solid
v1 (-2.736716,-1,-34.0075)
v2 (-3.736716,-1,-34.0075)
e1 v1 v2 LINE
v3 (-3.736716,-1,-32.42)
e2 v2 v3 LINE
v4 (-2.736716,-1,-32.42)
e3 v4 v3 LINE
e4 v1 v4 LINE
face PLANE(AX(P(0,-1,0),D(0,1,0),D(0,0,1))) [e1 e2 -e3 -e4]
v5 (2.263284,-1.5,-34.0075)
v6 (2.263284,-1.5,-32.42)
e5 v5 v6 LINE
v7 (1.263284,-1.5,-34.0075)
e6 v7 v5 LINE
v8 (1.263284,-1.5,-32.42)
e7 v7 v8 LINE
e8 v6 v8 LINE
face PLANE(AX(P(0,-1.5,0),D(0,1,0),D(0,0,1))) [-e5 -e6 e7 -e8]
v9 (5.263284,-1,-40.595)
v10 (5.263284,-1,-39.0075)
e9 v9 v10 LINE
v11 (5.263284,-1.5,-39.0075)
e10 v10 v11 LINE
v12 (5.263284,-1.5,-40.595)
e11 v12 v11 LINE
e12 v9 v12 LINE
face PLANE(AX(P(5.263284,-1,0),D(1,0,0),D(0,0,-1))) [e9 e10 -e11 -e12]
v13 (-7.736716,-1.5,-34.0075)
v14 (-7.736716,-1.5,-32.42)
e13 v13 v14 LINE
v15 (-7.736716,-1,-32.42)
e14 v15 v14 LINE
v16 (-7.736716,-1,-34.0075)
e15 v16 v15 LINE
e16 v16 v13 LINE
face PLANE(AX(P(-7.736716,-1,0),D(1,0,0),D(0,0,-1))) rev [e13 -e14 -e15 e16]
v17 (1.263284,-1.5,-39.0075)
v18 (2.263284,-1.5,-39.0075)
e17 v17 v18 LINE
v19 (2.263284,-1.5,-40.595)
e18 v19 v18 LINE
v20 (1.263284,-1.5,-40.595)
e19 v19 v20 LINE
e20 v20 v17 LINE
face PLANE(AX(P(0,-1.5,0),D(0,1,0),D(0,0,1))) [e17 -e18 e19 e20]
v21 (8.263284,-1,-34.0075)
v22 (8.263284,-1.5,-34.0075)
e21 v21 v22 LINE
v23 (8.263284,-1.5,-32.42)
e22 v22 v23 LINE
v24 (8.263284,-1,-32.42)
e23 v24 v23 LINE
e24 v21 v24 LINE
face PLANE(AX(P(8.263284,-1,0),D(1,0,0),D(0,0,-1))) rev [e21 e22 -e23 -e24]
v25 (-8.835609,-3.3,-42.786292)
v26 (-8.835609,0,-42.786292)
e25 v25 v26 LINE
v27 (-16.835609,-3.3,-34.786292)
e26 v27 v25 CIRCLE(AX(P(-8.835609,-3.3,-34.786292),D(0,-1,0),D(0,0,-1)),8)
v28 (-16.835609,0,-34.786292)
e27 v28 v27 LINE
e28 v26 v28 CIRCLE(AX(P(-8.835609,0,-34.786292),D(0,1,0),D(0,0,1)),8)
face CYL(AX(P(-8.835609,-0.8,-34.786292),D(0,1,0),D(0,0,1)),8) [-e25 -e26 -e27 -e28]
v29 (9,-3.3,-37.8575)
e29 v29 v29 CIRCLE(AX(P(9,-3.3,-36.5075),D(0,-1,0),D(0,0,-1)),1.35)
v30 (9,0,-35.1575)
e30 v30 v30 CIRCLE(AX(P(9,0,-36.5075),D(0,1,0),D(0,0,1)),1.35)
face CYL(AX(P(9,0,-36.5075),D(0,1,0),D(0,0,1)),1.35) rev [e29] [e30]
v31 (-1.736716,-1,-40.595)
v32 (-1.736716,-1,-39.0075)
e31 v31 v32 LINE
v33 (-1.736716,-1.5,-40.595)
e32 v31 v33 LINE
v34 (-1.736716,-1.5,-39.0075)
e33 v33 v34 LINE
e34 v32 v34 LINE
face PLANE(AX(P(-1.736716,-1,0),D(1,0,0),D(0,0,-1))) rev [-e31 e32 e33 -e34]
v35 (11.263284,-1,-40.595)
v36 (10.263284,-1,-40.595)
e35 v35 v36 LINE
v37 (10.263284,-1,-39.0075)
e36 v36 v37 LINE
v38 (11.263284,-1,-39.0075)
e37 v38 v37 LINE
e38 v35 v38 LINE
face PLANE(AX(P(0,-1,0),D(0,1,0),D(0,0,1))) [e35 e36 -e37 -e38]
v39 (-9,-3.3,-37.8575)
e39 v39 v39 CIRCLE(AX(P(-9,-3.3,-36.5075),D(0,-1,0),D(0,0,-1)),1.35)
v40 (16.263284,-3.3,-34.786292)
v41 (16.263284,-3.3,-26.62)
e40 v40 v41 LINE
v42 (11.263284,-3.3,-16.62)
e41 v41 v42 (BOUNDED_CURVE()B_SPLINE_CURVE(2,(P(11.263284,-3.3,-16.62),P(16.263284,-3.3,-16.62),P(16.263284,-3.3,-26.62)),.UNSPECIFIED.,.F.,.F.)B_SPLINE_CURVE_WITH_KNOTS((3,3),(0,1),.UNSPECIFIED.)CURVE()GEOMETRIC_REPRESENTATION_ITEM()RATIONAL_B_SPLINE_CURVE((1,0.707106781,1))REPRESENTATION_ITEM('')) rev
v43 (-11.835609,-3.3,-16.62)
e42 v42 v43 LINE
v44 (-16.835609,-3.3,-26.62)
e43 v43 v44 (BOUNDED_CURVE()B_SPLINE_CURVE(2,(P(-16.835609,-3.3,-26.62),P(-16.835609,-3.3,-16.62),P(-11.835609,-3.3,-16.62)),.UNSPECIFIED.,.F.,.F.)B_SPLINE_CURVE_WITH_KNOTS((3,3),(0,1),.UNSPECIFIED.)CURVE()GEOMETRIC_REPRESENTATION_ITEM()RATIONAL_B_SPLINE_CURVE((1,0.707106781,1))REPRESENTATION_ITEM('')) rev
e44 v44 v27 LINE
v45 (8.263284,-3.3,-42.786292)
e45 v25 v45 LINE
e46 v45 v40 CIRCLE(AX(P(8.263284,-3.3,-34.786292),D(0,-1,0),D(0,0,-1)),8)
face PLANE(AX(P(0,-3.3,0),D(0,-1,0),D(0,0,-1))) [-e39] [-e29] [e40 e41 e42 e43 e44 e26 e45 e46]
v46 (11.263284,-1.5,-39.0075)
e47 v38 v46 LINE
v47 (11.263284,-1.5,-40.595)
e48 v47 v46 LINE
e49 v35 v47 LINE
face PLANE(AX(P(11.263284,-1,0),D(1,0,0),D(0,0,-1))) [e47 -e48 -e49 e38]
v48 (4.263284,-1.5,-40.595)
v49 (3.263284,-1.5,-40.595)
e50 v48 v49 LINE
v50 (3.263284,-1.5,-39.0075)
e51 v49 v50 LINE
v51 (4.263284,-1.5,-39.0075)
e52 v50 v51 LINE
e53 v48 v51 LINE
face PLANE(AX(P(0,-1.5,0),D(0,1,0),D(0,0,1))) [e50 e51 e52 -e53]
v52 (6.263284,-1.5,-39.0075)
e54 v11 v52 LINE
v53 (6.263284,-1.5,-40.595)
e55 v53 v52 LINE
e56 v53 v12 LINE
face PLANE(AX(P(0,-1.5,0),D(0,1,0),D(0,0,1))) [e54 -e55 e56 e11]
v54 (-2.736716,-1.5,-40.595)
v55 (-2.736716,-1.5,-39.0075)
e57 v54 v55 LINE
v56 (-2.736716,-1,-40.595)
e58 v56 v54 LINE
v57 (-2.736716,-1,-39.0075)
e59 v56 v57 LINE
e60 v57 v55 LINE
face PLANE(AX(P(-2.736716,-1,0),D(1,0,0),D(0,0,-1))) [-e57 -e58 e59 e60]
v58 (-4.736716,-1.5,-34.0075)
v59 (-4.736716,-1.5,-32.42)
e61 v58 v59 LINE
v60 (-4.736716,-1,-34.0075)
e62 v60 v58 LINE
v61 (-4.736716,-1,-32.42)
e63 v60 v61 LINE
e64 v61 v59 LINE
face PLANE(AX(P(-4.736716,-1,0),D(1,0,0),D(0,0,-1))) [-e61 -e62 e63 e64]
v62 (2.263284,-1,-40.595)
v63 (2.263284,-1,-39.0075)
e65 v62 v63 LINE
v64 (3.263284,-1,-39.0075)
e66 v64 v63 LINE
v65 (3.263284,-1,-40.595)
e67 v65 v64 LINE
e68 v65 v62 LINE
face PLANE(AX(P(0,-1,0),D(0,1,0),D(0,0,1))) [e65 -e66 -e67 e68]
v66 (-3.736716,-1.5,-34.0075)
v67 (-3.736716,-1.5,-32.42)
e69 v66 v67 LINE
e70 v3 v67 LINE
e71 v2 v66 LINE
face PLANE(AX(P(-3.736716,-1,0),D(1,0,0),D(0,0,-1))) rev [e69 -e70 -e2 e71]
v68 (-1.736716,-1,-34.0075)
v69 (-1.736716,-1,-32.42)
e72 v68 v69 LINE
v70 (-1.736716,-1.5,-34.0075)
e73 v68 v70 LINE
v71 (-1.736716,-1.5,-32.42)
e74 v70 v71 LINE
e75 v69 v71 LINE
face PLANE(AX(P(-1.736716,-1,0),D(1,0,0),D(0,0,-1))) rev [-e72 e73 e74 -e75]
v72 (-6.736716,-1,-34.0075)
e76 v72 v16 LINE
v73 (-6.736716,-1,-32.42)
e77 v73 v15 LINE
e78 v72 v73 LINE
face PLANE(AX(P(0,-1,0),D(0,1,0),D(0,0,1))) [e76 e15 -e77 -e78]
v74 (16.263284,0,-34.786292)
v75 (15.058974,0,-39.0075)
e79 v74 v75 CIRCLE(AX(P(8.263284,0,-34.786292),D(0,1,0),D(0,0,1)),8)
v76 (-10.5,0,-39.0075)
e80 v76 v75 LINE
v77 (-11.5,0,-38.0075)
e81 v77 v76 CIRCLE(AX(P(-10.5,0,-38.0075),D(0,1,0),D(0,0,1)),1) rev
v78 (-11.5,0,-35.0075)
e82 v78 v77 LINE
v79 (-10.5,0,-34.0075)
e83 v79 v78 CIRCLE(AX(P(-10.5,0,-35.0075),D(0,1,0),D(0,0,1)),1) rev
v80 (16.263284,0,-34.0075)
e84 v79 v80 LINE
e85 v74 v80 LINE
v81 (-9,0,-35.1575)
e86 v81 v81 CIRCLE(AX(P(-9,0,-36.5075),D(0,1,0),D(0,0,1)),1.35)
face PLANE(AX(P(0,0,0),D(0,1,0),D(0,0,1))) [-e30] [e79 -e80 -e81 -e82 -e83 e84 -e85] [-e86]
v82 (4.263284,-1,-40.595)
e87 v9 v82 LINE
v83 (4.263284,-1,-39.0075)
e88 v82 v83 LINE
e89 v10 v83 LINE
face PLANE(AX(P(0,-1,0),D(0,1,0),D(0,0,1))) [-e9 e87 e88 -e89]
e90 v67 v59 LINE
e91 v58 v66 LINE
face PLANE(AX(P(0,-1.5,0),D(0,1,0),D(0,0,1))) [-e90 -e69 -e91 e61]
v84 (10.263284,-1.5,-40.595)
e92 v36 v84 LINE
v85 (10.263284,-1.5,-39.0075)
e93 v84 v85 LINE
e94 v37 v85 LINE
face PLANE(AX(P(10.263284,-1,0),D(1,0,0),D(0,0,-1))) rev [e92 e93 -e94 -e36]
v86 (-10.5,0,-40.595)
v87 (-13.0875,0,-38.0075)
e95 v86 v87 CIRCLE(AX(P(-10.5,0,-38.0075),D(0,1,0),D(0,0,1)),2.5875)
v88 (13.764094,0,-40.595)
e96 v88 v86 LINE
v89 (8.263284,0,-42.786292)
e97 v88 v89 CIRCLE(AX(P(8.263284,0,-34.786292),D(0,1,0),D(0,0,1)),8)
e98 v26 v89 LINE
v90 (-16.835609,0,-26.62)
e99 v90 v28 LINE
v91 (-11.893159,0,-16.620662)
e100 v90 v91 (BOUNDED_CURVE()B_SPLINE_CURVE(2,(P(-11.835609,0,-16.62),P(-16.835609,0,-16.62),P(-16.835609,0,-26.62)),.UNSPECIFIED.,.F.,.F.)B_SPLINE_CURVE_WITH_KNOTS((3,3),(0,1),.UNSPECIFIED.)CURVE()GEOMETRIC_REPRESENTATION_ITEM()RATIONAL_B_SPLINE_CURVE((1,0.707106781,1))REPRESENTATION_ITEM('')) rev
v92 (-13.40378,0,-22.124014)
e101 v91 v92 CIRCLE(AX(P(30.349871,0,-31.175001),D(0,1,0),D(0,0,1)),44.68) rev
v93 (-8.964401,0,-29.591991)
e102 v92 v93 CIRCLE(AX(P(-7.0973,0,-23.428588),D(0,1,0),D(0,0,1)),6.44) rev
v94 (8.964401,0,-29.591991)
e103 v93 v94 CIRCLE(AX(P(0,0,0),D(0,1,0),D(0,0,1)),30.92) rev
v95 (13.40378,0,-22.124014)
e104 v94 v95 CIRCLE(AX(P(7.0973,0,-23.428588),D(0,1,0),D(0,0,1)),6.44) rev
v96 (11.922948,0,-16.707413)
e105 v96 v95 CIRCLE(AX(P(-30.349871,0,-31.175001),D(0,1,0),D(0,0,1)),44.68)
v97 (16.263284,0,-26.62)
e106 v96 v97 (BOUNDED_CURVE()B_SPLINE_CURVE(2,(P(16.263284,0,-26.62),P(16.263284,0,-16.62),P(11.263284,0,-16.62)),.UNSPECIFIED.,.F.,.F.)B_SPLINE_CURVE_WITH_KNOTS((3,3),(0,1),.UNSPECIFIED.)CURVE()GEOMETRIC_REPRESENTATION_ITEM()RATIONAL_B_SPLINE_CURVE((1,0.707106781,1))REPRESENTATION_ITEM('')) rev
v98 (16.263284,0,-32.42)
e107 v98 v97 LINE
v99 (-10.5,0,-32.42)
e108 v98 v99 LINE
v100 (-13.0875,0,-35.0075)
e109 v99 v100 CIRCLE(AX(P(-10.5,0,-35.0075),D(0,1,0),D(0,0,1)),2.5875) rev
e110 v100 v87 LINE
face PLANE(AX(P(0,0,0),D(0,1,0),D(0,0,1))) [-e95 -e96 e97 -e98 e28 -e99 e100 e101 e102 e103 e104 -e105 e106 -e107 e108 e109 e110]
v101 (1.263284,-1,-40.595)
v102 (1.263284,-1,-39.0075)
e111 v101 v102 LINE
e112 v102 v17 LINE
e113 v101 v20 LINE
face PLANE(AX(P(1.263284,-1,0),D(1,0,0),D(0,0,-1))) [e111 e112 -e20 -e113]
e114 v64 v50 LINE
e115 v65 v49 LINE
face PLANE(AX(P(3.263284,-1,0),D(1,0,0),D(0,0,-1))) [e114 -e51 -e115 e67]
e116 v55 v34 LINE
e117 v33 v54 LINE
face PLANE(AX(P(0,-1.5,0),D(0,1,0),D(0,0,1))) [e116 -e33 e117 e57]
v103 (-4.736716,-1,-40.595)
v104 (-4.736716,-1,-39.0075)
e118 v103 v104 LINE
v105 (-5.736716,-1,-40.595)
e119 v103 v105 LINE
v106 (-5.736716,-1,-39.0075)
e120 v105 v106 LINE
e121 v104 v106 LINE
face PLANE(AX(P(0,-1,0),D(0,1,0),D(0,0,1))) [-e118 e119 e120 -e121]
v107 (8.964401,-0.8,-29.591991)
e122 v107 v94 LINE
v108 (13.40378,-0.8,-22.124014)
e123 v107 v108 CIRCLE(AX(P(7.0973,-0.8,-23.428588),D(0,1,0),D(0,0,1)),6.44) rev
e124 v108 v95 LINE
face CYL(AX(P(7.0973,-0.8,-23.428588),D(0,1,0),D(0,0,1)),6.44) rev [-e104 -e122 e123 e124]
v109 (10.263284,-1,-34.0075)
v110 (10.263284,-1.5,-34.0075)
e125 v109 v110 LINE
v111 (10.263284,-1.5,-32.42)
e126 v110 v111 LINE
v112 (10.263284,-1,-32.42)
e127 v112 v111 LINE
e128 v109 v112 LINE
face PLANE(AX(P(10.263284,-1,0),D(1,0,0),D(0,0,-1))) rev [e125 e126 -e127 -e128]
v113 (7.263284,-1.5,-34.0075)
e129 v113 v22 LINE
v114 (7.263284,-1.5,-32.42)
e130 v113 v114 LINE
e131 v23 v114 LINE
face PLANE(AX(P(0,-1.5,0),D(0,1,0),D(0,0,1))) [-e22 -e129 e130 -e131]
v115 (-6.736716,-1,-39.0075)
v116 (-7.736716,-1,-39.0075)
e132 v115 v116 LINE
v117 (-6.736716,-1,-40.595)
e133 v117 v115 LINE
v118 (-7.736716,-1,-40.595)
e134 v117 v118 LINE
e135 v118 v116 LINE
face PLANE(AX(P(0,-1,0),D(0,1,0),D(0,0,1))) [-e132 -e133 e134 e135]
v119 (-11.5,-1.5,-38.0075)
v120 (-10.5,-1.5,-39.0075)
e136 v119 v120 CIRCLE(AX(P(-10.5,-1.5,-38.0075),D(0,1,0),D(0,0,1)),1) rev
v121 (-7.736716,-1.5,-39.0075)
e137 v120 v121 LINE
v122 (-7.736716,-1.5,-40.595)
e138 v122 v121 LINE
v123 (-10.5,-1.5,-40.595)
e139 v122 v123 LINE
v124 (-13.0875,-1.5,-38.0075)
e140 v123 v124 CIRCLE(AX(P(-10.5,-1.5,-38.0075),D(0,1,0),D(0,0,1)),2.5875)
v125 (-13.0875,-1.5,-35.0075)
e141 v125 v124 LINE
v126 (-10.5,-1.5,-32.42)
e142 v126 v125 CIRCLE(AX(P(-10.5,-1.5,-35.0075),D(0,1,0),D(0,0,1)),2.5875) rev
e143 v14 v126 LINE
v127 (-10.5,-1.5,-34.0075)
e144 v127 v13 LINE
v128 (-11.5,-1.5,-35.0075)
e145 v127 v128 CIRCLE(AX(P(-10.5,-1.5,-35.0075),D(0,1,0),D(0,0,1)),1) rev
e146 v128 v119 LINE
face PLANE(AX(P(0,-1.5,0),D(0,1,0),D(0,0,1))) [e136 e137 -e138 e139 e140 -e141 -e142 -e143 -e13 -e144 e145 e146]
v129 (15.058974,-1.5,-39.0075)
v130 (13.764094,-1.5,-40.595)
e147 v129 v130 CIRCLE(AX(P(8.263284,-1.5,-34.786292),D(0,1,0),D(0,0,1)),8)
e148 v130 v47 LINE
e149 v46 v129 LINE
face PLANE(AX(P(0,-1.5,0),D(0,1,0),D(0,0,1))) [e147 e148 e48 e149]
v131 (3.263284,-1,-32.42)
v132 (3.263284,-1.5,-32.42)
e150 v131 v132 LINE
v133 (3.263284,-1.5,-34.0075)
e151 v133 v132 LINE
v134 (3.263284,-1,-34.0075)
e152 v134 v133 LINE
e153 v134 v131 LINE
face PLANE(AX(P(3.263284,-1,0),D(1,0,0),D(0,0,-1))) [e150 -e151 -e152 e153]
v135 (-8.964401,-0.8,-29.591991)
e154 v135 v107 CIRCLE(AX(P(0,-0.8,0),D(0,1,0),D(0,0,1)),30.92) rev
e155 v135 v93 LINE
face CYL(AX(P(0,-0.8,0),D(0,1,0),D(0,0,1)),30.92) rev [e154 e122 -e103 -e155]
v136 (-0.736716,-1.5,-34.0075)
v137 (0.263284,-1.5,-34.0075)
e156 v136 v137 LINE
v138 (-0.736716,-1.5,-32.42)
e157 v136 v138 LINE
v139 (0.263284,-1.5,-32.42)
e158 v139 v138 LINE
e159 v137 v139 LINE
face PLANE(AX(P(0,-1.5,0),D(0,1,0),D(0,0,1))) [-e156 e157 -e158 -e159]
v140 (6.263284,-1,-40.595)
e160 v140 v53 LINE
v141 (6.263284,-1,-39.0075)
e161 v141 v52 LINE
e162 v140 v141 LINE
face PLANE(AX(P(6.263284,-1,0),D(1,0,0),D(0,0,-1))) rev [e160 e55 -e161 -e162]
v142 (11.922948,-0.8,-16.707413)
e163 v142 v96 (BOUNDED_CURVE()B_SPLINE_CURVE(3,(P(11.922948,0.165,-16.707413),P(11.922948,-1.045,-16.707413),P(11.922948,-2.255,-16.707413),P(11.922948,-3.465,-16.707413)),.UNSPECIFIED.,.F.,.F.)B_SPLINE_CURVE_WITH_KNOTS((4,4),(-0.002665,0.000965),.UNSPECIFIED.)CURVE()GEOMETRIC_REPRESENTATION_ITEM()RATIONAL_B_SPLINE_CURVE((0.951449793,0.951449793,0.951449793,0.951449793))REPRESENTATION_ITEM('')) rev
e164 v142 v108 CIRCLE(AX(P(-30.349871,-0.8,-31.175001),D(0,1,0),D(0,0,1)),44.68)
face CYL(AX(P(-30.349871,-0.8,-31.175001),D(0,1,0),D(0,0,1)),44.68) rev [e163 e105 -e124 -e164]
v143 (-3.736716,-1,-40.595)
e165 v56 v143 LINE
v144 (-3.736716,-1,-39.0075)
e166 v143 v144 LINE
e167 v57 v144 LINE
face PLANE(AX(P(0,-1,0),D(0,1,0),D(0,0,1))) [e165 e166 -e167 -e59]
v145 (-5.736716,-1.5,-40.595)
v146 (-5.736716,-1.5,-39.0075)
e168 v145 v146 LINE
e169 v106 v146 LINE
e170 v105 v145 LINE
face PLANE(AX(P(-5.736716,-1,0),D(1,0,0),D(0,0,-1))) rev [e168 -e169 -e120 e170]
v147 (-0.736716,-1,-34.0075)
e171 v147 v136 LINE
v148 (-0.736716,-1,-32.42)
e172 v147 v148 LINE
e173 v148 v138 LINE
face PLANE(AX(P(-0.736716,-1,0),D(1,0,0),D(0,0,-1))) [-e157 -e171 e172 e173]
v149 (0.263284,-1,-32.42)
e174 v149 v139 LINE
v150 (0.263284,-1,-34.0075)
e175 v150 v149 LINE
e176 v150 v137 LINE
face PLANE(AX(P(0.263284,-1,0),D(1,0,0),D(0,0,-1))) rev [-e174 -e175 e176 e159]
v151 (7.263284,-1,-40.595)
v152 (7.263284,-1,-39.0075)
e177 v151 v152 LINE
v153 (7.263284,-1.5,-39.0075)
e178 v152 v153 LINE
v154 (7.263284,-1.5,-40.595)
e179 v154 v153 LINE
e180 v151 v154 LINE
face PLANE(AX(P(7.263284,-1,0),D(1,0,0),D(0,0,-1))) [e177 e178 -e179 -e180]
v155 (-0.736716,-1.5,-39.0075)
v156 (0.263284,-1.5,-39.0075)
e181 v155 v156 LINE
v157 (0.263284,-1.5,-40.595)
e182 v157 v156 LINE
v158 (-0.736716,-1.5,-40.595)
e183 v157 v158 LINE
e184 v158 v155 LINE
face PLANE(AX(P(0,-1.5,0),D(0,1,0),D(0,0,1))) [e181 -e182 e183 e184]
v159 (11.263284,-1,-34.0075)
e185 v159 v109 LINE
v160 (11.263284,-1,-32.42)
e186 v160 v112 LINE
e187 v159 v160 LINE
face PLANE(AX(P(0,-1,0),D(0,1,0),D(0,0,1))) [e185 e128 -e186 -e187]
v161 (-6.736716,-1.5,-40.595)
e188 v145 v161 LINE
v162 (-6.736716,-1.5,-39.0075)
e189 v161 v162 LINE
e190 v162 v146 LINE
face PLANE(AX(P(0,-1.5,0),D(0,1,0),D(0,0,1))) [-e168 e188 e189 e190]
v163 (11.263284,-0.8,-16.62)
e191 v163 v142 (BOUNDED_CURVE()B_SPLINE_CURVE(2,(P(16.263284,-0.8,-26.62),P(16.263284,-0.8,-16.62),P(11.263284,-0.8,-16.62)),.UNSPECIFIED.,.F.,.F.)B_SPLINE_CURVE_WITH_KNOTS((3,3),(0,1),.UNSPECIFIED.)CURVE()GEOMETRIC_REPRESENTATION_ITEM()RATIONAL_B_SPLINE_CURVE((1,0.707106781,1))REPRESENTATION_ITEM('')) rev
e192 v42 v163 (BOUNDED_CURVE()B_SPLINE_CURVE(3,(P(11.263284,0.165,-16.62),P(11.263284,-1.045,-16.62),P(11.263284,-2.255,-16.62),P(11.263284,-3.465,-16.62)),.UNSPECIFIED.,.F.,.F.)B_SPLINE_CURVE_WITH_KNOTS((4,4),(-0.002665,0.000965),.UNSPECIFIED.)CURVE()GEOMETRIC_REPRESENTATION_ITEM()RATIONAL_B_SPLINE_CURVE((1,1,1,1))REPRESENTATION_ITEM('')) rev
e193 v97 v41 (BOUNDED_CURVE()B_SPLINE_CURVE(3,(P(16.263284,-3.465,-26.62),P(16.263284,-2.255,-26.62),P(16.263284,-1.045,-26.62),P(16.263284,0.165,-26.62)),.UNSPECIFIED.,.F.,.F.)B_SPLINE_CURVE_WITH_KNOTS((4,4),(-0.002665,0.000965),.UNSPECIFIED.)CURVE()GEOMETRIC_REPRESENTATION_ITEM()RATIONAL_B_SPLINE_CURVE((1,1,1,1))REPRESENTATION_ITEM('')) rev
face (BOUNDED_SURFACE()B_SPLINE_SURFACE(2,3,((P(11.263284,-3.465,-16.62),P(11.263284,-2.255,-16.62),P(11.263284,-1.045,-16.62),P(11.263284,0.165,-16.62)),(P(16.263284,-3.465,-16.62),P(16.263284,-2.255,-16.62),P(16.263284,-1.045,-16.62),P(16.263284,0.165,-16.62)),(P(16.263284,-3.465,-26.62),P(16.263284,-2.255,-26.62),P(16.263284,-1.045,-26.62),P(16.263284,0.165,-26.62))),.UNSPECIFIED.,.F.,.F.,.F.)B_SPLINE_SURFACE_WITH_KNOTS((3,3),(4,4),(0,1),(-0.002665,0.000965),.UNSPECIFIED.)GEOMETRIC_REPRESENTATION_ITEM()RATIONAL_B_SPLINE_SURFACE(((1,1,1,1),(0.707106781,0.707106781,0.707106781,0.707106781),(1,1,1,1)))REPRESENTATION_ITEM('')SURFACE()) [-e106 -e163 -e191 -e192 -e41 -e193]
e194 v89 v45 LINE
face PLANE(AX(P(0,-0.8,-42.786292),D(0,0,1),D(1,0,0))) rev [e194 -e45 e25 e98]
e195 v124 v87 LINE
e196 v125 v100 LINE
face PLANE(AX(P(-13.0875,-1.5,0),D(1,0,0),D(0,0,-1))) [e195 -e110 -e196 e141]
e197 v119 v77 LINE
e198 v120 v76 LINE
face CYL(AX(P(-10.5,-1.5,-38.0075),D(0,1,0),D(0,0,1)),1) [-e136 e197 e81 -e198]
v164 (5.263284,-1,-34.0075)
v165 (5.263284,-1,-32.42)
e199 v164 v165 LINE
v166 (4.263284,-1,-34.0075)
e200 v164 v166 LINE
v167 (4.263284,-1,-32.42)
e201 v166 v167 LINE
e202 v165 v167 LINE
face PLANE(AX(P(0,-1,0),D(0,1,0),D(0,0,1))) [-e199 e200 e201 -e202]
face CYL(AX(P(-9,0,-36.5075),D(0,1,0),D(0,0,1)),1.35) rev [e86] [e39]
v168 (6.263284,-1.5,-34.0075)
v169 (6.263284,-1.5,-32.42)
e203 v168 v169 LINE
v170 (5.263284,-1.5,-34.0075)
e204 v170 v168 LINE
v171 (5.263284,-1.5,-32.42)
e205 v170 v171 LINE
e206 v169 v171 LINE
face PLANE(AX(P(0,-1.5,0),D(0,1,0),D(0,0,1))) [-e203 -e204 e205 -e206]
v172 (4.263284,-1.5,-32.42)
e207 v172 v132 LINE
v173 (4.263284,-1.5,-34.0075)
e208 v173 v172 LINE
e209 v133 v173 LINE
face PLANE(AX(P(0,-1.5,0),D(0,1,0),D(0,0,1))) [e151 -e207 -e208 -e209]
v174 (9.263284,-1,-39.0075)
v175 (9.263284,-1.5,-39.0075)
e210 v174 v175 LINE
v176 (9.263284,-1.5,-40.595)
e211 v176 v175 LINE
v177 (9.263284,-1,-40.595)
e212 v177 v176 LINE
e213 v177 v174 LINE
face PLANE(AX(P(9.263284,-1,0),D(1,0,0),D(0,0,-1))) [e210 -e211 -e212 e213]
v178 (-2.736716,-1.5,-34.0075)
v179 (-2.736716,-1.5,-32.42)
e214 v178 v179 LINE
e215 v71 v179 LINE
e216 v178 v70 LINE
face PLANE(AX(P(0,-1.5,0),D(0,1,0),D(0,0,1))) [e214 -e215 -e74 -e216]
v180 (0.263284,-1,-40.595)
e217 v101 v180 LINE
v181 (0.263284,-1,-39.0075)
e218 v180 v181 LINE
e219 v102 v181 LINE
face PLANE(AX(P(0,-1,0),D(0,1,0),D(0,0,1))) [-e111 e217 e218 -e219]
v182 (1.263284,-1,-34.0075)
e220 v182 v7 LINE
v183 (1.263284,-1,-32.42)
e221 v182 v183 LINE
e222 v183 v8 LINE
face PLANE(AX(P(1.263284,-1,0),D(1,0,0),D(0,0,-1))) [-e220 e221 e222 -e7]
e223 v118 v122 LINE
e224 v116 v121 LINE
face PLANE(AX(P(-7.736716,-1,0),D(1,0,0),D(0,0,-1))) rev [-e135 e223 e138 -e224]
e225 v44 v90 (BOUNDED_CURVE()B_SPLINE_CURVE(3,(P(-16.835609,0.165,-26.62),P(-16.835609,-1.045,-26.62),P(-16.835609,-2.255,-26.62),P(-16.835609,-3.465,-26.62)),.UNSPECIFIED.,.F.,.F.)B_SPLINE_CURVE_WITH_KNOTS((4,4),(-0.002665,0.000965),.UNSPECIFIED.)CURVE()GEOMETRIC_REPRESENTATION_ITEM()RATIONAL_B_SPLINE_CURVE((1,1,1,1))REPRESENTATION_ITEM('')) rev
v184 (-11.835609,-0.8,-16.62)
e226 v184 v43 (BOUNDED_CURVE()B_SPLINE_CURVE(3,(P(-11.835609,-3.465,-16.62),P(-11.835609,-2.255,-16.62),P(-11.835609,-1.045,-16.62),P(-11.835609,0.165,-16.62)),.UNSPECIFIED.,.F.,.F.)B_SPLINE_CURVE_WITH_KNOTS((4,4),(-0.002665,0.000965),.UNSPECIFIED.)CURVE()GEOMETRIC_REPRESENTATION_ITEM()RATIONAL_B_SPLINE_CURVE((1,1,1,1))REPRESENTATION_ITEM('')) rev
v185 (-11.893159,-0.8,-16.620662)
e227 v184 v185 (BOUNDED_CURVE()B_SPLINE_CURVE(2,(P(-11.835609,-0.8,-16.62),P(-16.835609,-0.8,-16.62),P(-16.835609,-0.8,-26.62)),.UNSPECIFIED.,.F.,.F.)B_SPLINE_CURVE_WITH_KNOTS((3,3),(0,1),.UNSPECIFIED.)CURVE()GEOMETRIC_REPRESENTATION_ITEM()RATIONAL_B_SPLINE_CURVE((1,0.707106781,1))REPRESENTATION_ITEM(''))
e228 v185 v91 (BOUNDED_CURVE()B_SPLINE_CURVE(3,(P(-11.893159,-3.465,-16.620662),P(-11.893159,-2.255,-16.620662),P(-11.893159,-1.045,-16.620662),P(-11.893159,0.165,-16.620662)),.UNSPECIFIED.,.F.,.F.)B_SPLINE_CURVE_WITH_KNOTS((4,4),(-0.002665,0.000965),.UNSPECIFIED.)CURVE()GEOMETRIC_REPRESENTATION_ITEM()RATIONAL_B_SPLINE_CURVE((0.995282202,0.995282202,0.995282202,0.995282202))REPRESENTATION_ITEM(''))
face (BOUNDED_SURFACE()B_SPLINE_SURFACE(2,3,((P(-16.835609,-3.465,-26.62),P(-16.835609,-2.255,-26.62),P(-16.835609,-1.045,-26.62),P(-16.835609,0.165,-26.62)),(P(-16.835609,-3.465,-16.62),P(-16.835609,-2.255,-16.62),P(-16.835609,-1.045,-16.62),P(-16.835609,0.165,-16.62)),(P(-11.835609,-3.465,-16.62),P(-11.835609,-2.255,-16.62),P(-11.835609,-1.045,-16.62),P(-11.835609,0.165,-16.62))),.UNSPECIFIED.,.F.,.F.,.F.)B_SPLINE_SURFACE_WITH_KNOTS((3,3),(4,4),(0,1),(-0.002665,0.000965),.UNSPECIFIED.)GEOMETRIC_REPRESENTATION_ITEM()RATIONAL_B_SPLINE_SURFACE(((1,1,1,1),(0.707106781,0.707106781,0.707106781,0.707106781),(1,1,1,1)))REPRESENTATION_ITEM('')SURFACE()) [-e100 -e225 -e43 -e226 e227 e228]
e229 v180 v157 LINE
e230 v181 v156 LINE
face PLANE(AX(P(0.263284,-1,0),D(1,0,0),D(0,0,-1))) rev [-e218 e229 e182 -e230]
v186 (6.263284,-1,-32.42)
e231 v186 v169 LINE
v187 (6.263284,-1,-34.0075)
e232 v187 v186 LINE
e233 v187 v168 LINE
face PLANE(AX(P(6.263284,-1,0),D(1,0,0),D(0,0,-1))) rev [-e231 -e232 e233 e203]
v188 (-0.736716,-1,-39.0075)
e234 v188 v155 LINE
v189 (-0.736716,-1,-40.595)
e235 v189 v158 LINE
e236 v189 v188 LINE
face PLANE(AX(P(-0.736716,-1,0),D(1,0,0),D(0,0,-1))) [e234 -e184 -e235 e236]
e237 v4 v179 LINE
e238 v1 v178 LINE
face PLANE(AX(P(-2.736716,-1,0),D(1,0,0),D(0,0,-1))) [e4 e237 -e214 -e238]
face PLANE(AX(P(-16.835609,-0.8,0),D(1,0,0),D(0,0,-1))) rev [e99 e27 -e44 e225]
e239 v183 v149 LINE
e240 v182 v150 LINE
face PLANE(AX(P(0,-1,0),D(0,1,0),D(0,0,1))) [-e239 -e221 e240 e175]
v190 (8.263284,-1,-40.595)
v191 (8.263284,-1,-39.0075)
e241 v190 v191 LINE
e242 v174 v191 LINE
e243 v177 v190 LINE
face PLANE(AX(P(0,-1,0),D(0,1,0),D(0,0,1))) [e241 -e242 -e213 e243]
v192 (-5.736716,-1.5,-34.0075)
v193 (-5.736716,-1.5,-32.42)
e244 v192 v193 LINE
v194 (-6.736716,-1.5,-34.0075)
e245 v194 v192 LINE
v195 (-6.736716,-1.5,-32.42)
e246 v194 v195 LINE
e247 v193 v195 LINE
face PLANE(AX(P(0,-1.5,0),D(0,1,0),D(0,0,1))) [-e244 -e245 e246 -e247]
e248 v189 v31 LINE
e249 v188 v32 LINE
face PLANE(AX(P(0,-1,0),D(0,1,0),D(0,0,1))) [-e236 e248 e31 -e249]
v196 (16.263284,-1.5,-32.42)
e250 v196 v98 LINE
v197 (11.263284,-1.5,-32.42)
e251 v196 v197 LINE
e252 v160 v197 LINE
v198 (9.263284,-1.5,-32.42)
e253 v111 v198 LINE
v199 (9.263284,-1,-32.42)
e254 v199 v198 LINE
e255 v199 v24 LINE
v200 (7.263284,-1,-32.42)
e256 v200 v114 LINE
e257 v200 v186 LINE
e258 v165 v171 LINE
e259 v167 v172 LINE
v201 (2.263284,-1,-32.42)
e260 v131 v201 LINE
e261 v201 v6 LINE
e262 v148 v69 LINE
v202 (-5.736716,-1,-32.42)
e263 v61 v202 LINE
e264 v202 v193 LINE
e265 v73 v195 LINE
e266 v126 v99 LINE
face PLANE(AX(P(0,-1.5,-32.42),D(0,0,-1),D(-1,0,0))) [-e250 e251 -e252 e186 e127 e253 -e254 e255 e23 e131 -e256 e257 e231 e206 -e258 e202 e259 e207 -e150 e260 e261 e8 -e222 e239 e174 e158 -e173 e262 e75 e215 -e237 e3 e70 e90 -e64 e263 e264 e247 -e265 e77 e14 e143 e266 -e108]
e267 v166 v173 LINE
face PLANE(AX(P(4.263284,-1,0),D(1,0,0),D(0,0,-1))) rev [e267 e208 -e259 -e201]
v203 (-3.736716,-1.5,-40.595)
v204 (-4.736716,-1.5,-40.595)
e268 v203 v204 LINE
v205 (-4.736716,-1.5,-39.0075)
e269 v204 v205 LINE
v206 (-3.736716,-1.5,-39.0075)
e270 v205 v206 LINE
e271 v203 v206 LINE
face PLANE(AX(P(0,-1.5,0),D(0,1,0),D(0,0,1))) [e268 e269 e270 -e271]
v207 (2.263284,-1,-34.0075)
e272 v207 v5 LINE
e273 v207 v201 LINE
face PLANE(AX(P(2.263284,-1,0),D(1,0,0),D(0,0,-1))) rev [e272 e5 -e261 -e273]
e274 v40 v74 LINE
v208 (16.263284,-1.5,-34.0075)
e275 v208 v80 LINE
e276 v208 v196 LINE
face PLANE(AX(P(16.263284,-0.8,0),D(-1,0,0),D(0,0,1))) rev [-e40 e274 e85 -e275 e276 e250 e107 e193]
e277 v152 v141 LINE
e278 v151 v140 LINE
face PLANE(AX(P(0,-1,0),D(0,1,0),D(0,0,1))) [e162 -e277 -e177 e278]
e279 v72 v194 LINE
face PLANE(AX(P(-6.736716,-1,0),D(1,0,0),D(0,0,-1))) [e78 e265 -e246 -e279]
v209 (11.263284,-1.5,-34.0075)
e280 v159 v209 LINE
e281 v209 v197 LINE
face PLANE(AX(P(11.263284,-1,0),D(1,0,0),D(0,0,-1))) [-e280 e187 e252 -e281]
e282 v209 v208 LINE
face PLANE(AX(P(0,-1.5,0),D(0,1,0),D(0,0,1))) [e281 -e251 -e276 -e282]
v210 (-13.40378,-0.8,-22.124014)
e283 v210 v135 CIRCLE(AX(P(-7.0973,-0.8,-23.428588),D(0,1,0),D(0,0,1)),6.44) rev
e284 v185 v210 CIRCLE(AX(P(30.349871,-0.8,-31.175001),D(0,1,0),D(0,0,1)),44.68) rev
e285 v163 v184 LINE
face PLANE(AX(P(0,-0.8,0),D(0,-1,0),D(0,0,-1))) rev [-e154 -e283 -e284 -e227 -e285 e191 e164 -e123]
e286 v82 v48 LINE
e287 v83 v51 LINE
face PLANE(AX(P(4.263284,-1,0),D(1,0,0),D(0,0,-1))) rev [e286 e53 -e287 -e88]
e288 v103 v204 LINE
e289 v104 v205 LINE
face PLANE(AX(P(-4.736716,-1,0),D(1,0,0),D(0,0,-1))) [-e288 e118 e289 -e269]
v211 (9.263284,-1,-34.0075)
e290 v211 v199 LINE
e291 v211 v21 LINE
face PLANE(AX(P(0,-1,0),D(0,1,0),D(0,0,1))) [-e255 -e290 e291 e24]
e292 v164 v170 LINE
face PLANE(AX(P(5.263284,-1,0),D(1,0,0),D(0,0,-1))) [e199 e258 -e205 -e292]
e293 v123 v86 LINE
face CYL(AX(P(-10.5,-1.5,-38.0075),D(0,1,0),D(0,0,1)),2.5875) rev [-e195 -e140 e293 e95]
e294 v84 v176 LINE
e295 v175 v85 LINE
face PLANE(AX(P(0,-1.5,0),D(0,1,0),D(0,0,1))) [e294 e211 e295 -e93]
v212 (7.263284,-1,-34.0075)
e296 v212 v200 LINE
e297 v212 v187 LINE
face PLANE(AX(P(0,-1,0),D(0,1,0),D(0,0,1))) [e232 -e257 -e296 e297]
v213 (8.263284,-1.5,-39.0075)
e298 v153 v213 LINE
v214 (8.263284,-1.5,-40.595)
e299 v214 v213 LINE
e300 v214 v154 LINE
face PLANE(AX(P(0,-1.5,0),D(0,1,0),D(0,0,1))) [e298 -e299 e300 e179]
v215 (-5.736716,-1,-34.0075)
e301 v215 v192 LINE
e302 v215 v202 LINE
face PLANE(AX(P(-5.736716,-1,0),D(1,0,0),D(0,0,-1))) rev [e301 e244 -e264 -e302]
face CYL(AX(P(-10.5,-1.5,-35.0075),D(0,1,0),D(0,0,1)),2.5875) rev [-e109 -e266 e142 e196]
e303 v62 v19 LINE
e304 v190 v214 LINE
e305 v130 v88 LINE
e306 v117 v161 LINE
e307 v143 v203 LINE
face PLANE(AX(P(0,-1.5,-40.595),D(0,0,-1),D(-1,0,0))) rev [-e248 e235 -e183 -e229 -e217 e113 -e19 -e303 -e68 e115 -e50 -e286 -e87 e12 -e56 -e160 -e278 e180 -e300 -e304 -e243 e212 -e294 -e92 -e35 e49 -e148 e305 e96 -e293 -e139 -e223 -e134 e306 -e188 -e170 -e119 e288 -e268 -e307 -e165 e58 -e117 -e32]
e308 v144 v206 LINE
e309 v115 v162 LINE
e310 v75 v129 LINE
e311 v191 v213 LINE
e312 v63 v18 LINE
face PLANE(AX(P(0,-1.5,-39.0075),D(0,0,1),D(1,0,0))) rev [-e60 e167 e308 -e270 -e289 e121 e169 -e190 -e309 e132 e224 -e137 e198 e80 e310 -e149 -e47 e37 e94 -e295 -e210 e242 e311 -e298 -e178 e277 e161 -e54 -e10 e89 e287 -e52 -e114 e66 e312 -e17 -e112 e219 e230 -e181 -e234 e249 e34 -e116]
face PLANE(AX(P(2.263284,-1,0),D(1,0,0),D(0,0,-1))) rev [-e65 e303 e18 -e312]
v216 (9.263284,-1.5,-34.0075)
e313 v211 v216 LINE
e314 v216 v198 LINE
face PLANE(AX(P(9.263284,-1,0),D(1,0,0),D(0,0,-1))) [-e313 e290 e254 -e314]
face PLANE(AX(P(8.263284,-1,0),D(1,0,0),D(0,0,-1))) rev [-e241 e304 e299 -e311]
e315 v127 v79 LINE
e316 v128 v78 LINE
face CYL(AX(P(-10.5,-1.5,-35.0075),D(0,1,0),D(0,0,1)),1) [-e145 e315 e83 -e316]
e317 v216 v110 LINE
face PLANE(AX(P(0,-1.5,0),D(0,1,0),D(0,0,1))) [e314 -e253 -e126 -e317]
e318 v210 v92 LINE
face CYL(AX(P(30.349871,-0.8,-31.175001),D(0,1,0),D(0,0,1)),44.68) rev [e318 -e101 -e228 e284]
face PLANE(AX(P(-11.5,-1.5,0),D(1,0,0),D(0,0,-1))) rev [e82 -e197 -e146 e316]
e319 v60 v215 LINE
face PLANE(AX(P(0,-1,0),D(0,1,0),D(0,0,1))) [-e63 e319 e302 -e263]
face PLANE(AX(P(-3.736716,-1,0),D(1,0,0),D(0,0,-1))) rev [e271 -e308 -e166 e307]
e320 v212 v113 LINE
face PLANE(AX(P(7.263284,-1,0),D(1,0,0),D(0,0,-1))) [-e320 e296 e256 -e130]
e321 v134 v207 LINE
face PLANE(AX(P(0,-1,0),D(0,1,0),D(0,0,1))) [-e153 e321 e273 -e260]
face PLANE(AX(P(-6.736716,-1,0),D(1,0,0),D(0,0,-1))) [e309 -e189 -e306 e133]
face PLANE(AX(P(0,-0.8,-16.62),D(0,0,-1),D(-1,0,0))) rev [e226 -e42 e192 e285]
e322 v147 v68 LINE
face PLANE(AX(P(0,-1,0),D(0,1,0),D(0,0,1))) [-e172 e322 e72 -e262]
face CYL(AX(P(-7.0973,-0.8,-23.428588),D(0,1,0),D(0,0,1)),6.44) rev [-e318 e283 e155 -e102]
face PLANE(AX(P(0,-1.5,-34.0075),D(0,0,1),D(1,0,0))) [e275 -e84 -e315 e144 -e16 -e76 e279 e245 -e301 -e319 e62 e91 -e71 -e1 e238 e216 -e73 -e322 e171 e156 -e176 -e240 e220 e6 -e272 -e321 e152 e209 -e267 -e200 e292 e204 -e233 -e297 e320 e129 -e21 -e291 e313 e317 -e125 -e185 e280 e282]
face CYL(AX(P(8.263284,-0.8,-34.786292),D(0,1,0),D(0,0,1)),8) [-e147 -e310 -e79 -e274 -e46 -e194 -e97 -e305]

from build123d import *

# Parameters (mm, degrees)
BOSS_EXTRUDE1_DEPTH        = 0.8
BOSS_EXTRUDE4_START        = -0.8
BOSS_EXTRUDE4_DEPTH        = 2.5
CUT_EXTRUDE2_DEPTH         = 1.5
M2_5_CLEARANCE_HOLE1_D     = 2.7
M2_5_CLEARANCE_HOLE1_DEPTH = 11.188838164
M2_5_CLEARANCE_HOLE1_TIP   = 0.811161836
BOSS_EXTRUDE7_START        = -1.5
SKETCH11_W                 = 1
SKETCH11_H                 = 1.5875
BOSS_EXTRUDE7_DEPTH        = 0.5
LPATTERN2_COUNT            = 10
LPATTERN2_PITCH            = 2
FILLET4_R                  = 8
FILLET6_SIZE               = 5
FILLET6_SIZE_2             = 10
FILLET7_SIZE               = 5
FILLET7_SIZE_2             = 10


with BuildPart() as part:
    # Sketch3 → Boss-Extrude1 (new body)
    with BuildSketch(Plane(origin=(0, 0, 0), x_dir=(1, 0, 0), z_dir=(0, 1, 0))):
        with BuildLine():
            ThreePointArc((-8.964400592, 29.591990842), (0, 30.92), (8.964400592, 29.591990842))
            ThreePointArc((8.964400592, 29.591990842), (12.633049801, 26.719344266), (13.403780114, 22.124014011))
            ThreePointArc((13.403780114, 22.124014011), (12.736333478, 19.347857063), (11.892930693, 16.62))
            Line((11.892930693, 16.62), (16.263283948, 16.62))
            Line((16.263283948, 16.62), (16.263283948, 42.786292272))
            Line((16.263283948, 42.786292272), (-16.835608917, 42.786292272))
            Line((-16.835608917, 42.786292272), (-16.835608917, 16.62))
            Line((-16.835608917, 16.62), (-11.892930693, 16.62))
            ThreePointArc((-11.892930693, 16.62), (-12.736333478, 19.347857063), (-13.403780114, 22.124014011))
            ThreePointArc((-13.403780114, 22.124014011), (-12.633049801, 26.719344266), (-8.964400592, 29.591990842))
        make_face()
        with BuildLine():
            Line((-10.5, 32.42), (16.263283948, 32.42))
            Line((16.263283948, 32.42), (16.263283948, 34.0075))
            Line((16.263283948, 34.0075), (-10.5, 34.0075))
            ThreePointArc((-10.5, 34.0075), (-11.207106781, 34.300393219), (-11.5, 35.0075))
            Line((-11.5, 35.0075), (-11.5, 38.0075))
            ThreePointArc((-11.5, 38.0075), (-11.207106781, 38.714606781), (-10.5, 39.0075))
            Line((-10.5, 39.0075), (16.263283948, 39.0075))
            Line((16.263283948, 39.0075), (16.263283948, 40.595))
            Line((16.263283948, 40.595), (-10.5, 40.595))
            ThreePointArc((-10.5, 40.595), (-12.329638796, 39.837138796), (-13.0875, 38.0075))
            Line((-13.0875, 38.0075), (-13.0875, 35.0075))
            ThreePointArc((-13.0875, 35.0075), (-12.329638796, 33.177861204), (-10.5, 32.42))
        make_face()
        with BuildLine():
            Line((-10.5, 34.0075), (16.263283948, 34.0075))
            Line((16.263283948, 34.0075), (16.263283948, 39.0075))
            Line((16.263283948, 39.0075), (-10.5, 39.0075))
            ThreePointArc((-10.5, 39.0075), (-11.207106781, 38.714606781), (-11.5, 38.0075))
            Line((-11.5, 38.0075), (-11.5, 35.0075))
            ThreePointArc((-11.5, 35.0075), (-11.207106781, 34.300393219), (-10.5, 34.0075))
        make_face()
    extrude(amount=-BOSS_EXTRUDE1_DEPTH)

    # Sketch3<5> → Boss-Extrude4 (add)
    with BuildSketch(Plane(origin=(0, 0, 0), x_dir=(1, 0, 0), z_dir=(0, 1, 0)).offset(BOSS_EXTRUDE4_START)):
        with BuildLine():
            ThreePointArc((-8.964400592, 29.591990842), (0, 30.92), (8.964400592, 29.591990842))
            ThreePointArc((8.964400592, 29.591990842), (12.633049801, 26.719344266), (13.403780114, 22.124014011))
            ThreePointArc((13.403780114, 22.124014011), (12.736333478, 19.347857063), (11.892930693, 16.62))
            Line((11.892930693, 16.62), (16.263283948, 16.62))
            Line((16.263283948, 16.62), (16.263283948, 42.786292272))
            Line((16.263283948, 42.786292272), (-16.835608917, 42.786292272))
            Line((-16.835608917, 42.786292272), (-16.835608917, 16.62))
            Line((-16.835608917, 16.62), (-11.892930693, 16.62))
            ThreePointArc((-11.892930693, 16.62), (-12.736333478, 19.347857063), (-13.403780114, 22.124014011))
            ThreePointArc((-13.403780114, 22.124014011), (-12.633049801, 26.719344266), (-8.964400592, 29.591990842))
        make_face()
        with BuildLine():
            ThreePointArc((8.964400592, 29.591990842), (12.633049801, 26.719344266), (13.403780114, 22.124014011))
            ThreePointArc((13.403780114, 22.124014011), (12.736333478, 19.347857063), (11.892930693, 16.62))
            Line((11.892930693, 16.62), (-11.892930693, 16.62))
            ThreePointArc((-11.892930693, 16.62), (-12.736333478, 19.347857063), (-13.403780114, 22.124014011))
            ThreePointArc((-13.403780114, 22.124014011), (-12.633049801, 26.719344266), (-8.964400592, 29.591990842))
            ThreePointArc((-8.964400592, 29.591990842), (0, 30.92), (8.964400592, 29.591990842))
        make_face()
        with BuildLine():
            Line((-10.5, 32.42), (16.263283948, 32.42))
            Line((16.263283948, 32.42), (16.263283948, 34.0075))
            Line((16.263283948, 34.0075), (-10.5, 34.0075))
            ThreePointArc((-10.5, 34.0075), (-11.207106781, 34.300393219), (-11.5, 35.0075))
            Line((-11.5, 35.0075), (-11.5, 38.0075))
            ThreePointArc((-11.5, 38.0075), (-11.207106781, 38.714606781), (-10.5, 39.0075))
            Line((-10.5, 39.0075), (16.263283948, 39.0075))
            Line((16.263283948, 39.0075), (16.263283948, 40.595))
            Line((16.263283948, 40.595), (-10.5, 40.595))
            ThreePointArc((-10.5, 40.595), (-12.329638796, 39.837138796), (-13.0875, 38.0075))
            Line((-13.0875, 38.0075), (-13.0875, 35.0075))
            ThreePointArc((-13.0875, 35.0075), (-12.329638796, 33.177861204), (-10.5, 32.42))
        make_face()
        with BuildLine():
            Line((-10.5, 34.0075), (16.263283948, 34.0075))
            Line((16.263283948, 34.0075), (16.263283948, 39.0075))
            Line((16.263283948, 39.0075), (-10.5, 39.0075))
            ThreePointArc((-10.5, 39.0075), (-11.207106781, 38.714606781), (-11.5, 38.0075))
            Line((-11.5, 38.0075), (-11.5, 35.0075))
            ThreePointArc((-11.5, 35.0075), (-11.207106781, 34.300393219), (-10.5, 34.0075))
        make_face()
    extrude(amount=-BOSS_EXTRUDE4_DEPTH)

    # Sketch3<7> → Cut-Extrude2 (cut)
    with BuildSketch(Plane(origin=(0, 0, 0), x_dir=(1, 0, 0), z_dir=(0, 1, 0))):
        with BuildLine():
            Line((-10.5, 32.42), (16.263283948, 32.42))
            Line((16.263283948, 32.42), (16.263283948, 34.0075))
            Line((16.263283948, 34.0075), (-10.5, 34.0075))
            ThreePointArc((-10.5, 34.0075), (-11.207106781, 34.300393219), (-11.5, 35.0075))
            Line((-11.5, 35.0075), (-11.5, 38.0075))
            ThreePointArc((-11.5, 38.0075), (-11.207106781, 38.714606781), (-10.5, 39.0075))
            Line((-10.5, 39.0075), (16.263283948, 39.0075))
            Line((16.263283948, 39.0075), (16.263283948, 40.595))
            Line((16.263283948, 40.595), (-10.5, 40.595))
            ThreePointArc((-10.5, 40.595), (-12.329638796, 39.837138796), (-13.0875, 38.0075))
            Line((-13.0875, 38.0075), (-13.0875, 35.0075))
            ThreePointArc((-13.0875, 35.0075), (-12.329638796, 33.177861204), (-10.5, 32.42))
        make_face()
    extrude(amount=-CUT_EXTRUDE2_DEPTH, mode=Mode.SUBTRACT)

    # M2.5 Clearance Hole1
    with Locations(Plane(origin=(0, 0, 0), x_dir=(1, 0, 0), z_dir=(0, 1, 0))):
        with Locations((-9, 36.5075), (9, 36.5075)):
            Hole(M2_5_CLEARANCE_HOLE1_D / 2, depth=M2_5_CLEARANCE_HOLE1_DEPTH)
            with Locations((0, 0, -(M2_5_CLEARANCE_HOLE1_DEPTH + M2_5_CLEARANCE_HOLE1_TIP / 2))):  # 118° drill point
                Cone(0, M2_5_CLEARANCE_HOLE1_D / 2, M2_5_CLEARANCE_HOLE1_TIP, mode=Mode.SUBTRACT)

    # Sketch11 → Boss-Extrude7 (add)
    with BuildSketch(Plane(origin=(0, 0, 0), x_dir=(1, 0, 0), z_dir=(0, 1, 0)).offset(BOSS_EXTRUDE7_START)):
        with Locations((10.763283948, 39.80125)):
            Rectangle(SKETCH11_W, SKETCH11_H)
        with Locations((10.763283948, 33.21375)):
            Rectangle(SKETCH11_W, SKETCH11_H)
    boss_extrude7 = extrude(amount=BOSS_EXTRUDE7_DEPTH)

    # LPattern2: Boss-Extrude7 ×10
    with Locations(*[(-i * LPATTERN2_PITCH, 0, 0) for i in range(1, LPATTERN2_COUNT)]):
        add(boss_extrude7)

    # Fillet4
    fillet4_edges = [part.edges().sort_by_distance(p)[0] for p in [
        (16.263283948, -1.65, -42.786292272),
        (-16.835608917, -1.65, -42.786292272),
    ]]
    fillet(fillet4_edges, radius=FILLET4_R)

    # Fillet6
    # an asymmetric fillet: 10, 5 mm, written as the material it takes off along each edge
    with BuildSketch(Plane(origin=(16.263283948, -28.3, -16.62), x_dir=(-1, 0, 0), z_dir=(0, 1, 0))) as fillet6_piece_1:
        with BuildLine():
            Bezier((FILLET6_SIZE, 0), (0, 0), (0, -FILLET6_SIZE_2), weights=[1, 0.707106781, 1])
            Line((0, -FILLET6_SIZE_2), (0, 0))
            Line((0, 0), (FILLET6_SIZE, 0))
        make_face()
    extrude(amount=53.3, mode=Mode.SUBTRACT)

    # Fillet7
    # an asymmetric fillet: 10, 5 mm, written as the material it takes off along each edge
    with BuildSketch(Plane(origin=(-16.835608917, 25, -16.62), x_dir=(1, 0, 0), z_dir=(0, -1, 0))) as fillet7_piece_1:
        with BuildLine():
            Bezier((FILLET7_SIZE, 0), (0, 0), (0, -FILLET7_SIZE_2), weights=[1, 0.707106781, 1])
            Line((0, -FILLET7_SIZE_2), (0, 0))
            Line((0, 0), (FILLET7_SIZE, 0))
        make_face()
    extrude(amount=53.3, mode=Mode.SUBTRACT)


solid = part.part
